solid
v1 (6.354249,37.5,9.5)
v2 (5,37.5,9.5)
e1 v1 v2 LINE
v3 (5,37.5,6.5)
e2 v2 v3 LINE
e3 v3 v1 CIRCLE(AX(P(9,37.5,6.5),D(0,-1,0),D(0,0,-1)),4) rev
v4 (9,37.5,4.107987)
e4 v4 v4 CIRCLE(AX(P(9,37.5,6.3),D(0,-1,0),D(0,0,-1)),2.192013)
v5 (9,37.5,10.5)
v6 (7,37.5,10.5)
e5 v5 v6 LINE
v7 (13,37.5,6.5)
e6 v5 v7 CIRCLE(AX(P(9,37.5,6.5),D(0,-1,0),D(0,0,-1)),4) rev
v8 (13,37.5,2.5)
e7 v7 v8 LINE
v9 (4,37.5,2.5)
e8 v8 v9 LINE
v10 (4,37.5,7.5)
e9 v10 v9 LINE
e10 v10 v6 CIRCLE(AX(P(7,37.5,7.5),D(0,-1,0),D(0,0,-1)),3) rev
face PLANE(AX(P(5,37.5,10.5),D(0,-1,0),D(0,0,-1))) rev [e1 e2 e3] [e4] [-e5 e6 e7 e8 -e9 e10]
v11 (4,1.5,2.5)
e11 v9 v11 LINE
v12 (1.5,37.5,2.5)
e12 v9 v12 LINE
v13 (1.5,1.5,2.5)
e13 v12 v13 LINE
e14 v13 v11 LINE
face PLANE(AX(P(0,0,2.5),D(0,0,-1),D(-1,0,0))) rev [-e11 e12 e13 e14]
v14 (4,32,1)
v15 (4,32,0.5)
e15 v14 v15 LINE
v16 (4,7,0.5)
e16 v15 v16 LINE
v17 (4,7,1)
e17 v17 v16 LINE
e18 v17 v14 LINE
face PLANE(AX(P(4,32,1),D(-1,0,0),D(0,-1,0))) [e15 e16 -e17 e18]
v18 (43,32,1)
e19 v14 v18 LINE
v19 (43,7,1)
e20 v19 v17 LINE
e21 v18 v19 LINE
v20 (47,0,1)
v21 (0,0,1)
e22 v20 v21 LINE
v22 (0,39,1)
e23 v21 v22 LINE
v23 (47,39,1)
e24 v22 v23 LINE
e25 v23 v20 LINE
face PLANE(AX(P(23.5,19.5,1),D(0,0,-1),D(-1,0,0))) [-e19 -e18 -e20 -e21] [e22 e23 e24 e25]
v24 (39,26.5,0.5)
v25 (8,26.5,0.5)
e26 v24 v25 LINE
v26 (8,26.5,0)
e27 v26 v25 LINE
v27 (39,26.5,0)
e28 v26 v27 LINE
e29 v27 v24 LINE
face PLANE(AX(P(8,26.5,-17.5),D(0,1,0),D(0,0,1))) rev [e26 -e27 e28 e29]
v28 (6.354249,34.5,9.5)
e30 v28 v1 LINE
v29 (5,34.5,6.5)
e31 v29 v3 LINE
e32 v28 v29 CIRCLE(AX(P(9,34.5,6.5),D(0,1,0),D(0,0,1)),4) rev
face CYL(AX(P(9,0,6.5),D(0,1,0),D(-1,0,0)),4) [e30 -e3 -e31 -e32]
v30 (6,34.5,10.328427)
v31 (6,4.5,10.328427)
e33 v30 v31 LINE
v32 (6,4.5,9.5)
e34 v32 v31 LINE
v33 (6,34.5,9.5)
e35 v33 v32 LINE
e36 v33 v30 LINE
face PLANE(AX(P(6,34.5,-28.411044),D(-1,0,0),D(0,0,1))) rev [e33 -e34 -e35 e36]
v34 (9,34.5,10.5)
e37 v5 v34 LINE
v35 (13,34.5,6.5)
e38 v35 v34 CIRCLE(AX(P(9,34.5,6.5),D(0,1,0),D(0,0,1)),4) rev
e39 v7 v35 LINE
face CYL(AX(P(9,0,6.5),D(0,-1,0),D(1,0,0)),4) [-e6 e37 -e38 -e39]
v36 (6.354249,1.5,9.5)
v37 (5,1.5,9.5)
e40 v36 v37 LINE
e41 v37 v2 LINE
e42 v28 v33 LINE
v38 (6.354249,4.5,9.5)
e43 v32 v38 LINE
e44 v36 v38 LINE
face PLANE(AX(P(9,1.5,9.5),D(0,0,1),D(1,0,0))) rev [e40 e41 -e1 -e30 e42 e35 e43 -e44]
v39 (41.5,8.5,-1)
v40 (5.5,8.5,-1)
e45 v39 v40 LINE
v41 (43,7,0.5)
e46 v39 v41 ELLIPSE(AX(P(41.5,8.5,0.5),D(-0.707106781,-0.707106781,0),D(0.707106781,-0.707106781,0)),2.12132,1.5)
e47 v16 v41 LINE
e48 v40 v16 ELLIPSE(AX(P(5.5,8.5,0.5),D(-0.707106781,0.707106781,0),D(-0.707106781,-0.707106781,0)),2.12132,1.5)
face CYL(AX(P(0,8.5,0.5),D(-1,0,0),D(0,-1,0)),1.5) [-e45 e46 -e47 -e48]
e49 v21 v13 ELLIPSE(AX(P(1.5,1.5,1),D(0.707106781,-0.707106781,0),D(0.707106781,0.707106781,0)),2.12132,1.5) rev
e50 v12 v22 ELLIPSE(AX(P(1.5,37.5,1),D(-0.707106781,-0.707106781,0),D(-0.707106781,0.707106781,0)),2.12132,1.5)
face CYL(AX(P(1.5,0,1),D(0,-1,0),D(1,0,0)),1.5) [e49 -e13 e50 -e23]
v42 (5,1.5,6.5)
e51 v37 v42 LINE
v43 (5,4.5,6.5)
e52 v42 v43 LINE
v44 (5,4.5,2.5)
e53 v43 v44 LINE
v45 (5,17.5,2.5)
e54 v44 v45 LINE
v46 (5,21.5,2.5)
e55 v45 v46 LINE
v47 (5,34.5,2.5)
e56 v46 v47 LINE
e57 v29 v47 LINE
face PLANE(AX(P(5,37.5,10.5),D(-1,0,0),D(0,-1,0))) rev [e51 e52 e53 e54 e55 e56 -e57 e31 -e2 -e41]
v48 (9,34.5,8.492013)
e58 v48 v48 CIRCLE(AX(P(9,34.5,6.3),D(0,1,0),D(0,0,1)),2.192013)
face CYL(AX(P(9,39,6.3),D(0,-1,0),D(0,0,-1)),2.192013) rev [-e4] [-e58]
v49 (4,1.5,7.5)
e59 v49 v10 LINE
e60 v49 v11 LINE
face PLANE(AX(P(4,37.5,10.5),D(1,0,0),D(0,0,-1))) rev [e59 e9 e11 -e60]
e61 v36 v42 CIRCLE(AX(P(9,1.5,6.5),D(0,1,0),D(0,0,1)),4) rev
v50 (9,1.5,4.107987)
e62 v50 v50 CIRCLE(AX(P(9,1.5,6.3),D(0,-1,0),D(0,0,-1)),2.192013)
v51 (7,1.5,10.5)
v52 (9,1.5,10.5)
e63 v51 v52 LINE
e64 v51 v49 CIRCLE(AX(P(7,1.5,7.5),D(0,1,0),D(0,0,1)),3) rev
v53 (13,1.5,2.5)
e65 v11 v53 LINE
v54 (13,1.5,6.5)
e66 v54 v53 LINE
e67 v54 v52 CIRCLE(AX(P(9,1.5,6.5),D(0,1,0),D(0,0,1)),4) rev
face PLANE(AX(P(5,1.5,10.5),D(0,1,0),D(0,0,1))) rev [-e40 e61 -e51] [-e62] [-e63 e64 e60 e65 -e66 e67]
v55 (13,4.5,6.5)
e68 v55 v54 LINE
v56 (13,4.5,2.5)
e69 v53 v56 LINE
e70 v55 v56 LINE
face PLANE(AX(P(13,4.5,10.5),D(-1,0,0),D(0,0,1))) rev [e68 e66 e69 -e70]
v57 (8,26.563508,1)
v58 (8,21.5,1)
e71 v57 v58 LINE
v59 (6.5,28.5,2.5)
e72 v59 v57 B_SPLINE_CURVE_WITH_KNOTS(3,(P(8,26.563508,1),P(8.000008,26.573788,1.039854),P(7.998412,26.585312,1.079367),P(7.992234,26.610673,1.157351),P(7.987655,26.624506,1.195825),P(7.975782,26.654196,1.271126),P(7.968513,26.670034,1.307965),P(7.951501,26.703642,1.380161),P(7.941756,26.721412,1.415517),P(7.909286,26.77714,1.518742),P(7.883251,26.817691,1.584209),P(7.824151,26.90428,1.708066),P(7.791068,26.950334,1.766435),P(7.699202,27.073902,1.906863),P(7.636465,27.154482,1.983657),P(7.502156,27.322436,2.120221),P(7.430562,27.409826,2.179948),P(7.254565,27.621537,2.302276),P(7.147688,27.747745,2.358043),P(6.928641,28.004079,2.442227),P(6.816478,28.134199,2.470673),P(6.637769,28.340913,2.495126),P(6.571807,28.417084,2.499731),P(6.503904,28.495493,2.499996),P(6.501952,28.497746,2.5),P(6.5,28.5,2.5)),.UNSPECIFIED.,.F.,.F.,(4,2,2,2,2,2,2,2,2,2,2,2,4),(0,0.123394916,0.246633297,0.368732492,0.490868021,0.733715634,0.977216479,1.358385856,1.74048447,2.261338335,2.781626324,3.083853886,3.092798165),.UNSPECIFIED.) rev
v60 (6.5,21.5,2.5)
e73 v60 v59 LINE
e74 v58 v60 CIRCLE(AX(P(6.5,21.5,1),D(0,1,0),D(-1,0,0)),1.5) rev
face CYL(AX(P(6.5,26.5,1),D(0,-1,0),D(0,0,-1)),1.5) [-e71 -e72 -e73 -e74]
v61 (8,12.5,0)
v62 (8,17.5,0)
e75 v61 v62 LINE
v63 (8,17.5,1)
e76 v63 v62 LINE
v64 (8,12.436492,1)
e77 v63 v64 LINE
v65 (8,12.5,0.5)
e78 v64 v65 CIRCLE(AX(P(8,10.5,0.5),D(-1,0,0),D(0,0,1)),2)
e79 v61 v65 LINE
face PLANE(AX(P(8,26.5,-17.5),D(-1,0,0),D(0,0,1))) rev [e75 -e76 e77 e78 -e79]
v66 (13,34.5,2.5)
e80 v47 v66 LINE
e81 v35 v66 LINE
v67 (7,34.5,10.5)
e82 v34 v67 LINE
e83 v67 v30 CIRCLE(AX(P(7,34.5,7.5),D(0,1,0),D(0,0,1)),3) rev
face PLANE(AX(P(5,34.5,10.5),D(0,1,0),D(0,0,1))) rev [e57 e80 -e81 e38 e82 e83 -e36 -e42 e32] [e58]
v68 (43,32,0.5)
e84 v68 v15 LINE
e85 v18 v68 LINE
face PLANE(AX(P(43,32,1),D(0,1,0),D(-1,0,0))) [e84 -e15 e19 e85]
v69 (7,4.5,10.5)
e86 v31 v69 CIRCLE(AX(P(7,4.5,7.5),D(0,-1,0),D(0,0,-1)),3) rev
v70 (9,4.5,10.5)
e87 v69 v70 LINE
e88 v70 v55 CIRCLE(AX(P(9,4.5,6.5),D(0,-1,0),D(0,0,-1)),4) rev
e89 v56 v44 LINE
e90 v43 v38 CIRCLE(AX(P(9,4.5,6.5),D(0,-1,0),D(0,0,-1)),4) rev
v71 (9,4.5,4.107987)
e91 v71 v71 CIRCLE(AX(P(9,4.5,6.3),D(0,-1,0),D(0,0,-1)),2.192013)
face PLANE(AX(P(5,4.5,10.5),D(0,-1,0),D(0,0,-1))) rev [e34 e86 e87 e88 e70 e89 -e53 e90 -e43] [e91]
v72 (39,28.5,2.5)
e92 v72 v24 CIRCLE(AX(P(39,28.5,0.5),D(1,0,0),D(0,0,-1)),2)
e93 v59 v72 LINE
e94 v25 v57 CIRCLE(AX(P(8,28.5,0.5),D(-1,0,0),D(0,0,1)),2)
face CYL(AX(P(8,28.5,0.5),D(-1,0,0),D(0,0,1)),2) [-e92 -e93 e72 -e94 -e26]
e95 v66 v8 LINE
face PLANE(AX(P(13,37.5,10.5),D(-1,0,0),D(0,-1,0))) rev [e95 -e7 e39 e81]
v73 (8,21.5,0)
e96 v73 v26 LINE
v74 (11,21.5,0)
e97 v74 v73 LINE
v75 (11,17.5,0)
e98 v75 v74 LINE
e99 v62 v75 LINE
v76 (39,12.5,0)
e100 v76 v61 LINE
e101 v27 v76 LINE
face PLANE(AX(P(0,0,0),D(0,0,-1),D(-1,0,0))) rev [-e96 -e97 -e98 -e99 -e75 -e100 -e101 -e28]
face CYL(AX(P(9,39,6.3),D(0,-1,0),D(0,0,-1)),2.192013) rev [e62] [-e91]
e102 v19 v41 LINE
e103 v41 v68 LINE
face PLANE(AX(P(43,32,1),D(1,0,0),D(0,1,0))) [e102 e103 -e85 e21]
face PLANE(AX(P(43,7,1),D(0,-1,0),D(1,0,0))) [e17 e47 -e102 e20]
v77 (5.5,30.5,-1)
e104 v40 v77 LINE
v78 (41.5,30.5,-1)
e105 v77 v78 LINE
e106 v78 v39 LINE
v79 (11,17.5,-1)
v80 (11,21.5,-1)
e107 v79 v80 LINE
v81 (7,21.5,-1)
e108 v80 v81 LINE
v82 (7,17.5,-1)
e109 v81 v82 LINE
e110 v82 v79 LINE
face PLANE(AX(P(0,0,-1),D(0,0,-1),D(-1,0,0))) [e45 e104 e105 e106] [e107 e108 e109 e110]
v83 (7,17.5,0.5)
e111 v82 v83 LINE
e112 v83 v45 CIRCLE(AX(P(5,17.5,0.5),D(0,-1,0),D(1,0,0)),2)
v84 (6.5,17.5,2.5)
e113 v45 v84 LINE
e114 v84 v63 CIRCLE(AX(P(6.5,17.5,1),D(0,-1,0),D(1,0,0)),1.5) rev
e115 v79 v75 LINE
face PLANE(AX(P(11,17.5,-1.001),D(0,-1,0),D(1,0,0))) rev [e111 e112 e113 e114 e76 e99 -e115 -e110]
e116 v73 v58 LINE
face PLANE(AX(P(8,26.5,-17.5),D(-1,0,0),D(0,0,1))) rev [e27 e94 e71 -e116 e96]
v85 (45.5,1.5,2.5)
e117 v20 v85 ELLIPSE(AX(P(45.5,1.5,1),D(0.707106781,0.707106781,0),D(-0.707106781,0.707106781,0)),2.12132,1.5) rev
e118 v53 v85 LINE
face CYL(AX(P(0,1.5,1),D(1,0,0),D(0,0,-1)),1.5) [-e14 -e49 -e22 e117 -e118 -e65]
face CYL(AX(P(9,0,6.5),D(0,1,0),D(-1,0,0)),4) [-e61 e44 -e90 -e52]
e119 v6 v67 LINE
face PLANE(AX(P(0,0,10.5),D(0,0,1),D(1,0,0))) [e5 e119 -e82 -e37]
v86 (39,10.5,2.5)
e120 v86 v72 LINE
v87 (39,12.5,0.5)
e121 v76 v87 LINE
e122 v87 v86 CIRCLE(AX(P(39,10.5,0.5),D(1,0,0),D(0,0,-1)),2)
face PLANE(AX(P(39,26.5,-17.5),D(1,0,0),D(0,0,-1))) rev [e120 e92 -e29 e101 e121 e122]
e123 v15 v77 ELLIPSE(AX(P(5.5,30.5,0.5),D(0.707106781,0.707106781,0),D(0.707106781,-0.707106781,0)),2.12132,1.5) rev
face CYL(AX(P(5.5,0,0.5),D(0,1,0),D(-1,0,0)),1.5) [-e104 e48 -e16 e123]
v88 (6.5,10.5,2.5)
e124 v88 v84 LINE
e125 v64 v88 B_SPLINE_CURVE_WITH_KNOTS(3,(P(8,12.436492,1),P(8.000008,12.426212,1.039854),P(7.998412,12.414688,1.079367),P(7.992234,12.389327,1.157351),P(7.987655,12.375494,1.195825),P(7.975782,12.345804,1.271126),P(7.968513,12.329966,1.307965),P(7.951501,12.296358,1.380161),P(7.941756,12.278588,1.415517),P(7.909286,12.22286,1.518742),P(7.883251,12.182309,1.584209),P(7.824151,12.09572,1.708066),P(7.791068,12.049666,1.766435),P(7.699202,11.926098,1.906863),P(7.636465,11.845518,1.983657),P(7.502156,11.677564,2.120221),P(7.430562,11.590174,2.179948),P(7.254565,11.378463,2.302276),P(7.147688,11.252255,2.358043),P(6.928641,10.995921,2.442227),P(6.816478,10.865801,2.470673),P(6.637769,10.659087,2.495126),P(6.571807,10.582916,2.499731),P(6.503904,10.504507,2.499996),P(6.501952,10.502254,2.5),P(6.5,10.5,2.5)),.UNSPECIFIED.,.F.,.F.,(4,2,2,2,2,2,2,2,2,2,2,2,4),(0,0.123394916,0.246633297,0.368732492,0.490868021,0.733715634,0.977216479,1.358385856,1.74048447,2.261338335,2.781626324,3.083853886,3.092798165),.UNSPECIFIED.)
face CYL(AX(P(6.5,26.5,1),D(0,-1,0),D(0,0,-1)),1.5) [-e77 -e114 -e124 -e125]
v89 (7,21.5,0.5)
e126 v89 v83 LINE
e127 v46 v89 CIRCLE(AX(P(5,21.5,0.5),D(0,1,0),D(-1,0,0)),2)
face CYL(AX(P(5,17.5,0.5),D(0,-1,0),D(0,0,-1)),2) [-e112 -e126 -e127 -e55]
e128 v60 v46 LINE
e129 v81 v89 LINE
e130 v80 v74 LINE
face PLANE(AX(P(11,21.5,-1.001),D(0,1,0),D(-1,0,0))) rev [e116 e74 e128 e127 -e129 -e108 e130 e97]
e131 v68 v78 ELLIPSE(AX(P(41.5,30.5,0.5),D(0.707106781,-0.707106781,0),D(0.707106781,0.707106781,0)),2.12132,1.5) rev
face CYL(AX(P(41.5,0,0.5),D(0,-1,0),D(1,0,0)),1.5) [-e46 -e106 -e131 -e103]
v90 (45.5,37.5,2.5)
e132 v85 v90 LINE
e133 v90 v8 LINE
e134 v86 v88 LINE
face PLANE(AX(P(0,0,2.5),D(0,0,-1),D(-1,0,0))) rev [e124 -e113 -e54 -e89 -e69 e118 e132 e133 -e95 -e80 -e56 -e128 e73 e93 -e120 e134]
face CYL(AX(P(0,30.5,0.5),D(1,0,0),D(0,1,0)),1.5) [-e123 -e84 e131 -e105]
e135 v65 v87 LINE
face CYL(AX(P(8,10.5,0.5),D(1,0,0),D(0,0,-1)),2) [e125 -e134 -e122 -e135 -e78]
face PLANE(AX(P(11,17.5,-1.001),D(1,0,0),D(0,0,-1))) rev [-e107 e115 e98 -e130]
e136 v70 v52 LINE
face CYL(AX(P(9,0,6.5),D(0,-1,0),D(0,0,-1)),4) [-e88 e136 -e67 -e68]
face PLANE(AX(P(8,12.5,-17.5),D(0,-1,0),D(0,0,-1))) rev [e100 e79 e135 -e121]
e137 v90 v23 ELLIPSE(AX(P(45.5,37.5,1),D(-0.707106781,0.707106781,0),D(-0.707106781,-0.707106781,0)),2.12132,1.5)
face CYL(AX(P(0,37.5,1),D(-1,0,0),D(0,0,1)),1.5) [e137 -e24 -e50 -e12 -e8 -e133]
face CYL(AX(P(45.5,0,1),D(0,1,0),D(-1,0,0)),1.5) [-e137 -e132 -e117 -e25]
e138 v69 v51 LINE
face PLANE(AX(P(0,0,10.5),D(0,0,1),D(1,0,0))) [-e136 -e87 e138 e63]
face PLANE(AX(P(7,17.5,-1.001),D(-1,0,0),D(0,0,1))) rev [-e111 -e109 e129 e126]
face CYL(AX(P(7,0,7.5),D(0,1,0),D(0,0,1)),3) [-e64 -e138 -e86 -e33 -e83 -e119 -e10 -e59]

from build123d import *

# Parameters (mm, degrees)
ESQUISSE1_W             = 47
ESQUISSE1_H             = 39
BOSS_EXTRU_1_DEPTH      = 2.5
ESQUISSE2_W             = 8
ESQUISSE2_H             = 3
BOSS_EXTRU_2_DEPTH      = 8
ESQUISSE3_R             = 2.192012696
ENL_V_MAT_EXTRU_1_DEPTH = 62.036874101
CONG_1_R                = 4
ESQUISSE4_W             = 31
ESQUISSE4_H             = 14
ENL_V_MAT_EXTRU_2_DEPTH = 20
CONG_2_R                = 2
ESQUISSE8_W             = 1
ESQUISSE8_H             = 36
BOSS_EXTRU_5_DEPTH      = 8
ESQUISSE9_W             = 1
ESQUISSE9_H             = 36
BOSS_EXTRU_6_DEPTH      = 4
ESQUISSE10_W            = 7.449336574
ESQUISSE10_H            = 30
ENL_V_MAT_EXTRU_4_DEPTH = 8
CONG_4_R                = 3
ESQUISSE11_OUTSIDE_W    = 61.394
ESQUISSE11_OUTSIDE_H    = 53.394
ESQUISSE11_OUTSIDE_W_2  = 39
ESQUISSE11_OUTSIDE_H_2  = 25
ENL_V_MAT_EXTRU_5_DEPTH = 1
ESQUISSE12_W            = 39
ESQUISSE12_H            = 25
BOSS_EXTRU_7_DEPTH      = 1
ENL_V_MAT_EXTRU_6_REACH = 63.595
ESQUISSE13_W            = 4
ESQUISSE13_H            = 4
CONG_6_R                = 2
CONG_7_R                = 1.5
CONG_8_R                = 1.5


# Some blends are built 0.0001 mm under size
with BuildPart() as part:
    # Esquisse1 → Boss.-Extru.1 (new body)
    with BuildSketch(Plane.XY):
        with Locations((23.5, 19.5)):
            Rectangle(ESQUISSE1_W, ESQUISSE1_H)
    extrude(amount=BOSS_EXTRU_1_DEPTH)

    # Esquisse2 → Boss.-Extru.2 (add)
    with BuildSketch(Plane.XY.offset(2.5)):
        with Locations((9, 36)):
            Rectangle(ESQUISSE2_W, ESQUISSE2_H)
        with Locations((9, 3)):
            Rectangle(ESQUISSE2_W, ESQUISSE2_H)
    extrude(amount=BOSS_EXTRU_2_DEPTH)

    # Esquisse3 → Enlèv. mat.-Extru.1 (cut, through all)
    with BuildSketch(Plane.XZ.offset(-1.5)):
        with Locations(Location((9, 6.3, 0), (0, 0, 270))):
            Circle(ESQUISSE3_R)
    extrude(amount=-ENL_V_MAT_EXTRU_1_DEPTH, mode=Mode.SUBTRACT)

    # Congé1
    cong_1_edges = [part.edges().sort_by_distance(p)[0] for p in [
        (13, 3, 10.5),
        (5, 3, 10.5),
        (13, 36, 10.5),
        (5, 36, 10.5),
    ]]
    fillet(cong_1_edges, radius=CONG_1_R - 0.0001)  # a hair under: the kernel refuses the full size

    # Esquisse4 → Enlèv. mat.-Extru.2 (cut)
    with BuildSketch(Plane.XY.offset(2.5)):
        with Locations((23.5, 19.5)):
            Rectangle(ESQUISSE4_W, ESQUISSE4_H)
    extrude(amount=-ENL_V_MAT_EXTRU_2_DEPTH, mode=Mode.SUBTRACT)

    # Congé2
    cong_2_edges = [part.edges().sort_by_distance(p)[0] for p in [
        (23.5, 12.5, 2.5),
        (23.5, 26.5, 2.5),
    ]]
    fillet(cong_2_edges, radius=CONG_2_R)

    # Esquisse8 → Boss.-Extru.5 (add)
    with BuildSketch(Plane.XY.offset(2.5)):
        with Locations((4.5, 19.5)):
            Rectangle(ESQUISSE8_W, ESQUISSE8_H)
    extrude(amount=BOSS_EXTRU_5_DEPTH)

    # Esquisse9 → Boss.-Extru.6 (add)
    with BuildSketch(Plane(origin=(5, 0, 0), x_dir=(0, 0, -1), z_dir=(1, 0, 0))):
        with Locations((-10, 19.5)):
            Rectangle(ESQUISSE9_W, ESQUISSE9_H)
    extrude(amount=BOSS_EXTRU_6_DEPTH)

    # Esquisse10 → Enlèv. mat.-Extru.4 (cut)
    with BuildSketch(Plane.XY.offset(10.5)):
        with Locations((9.724668287, 19.5)):
            Rectangle(ESQUISSE10_W, ESQUISSE10_H)
    extrude(amount=-ENL_V_MAT_EXTRU_4_DEPTH, mode=Mode.SUBTRACT)

    # Congé4
    # the kernel refuses this fillet: 3 mm, written as the material it takes off along each edge
    with BuildSketch(Plane(origin=(4, -6, 10.5), x_dir=(1, 0, 0), z_dir=(0, 1, 0))) as cong_4_piece_1:
        with BuildLine():
            CenterArc((CONG_4_R, CONG_4_R), CONG_4_R, 180, 90)
            Line((0, CONG_4_R), (0, 0))
            Line((0, 0), (CONG_4_R, 0))
        make_face()
    extrude(amount=51, mode=Mode.SUBTRACT)

    # Esquisse11 outside → Enlèv. mat.-Extru.5 (cut)
    with BuildSketch(Plane(origin=(0, 0, 0), x_dir=(-1, 0, 0), z_dir=(0, 0, -1))):
        with Locations((-23.5, 19.5)):
            Rectangle(ESQUISSE11_OUTSIDE_W, ESQUISSE11_OUTSIDE_H)
        with Locations((-23.5, 19.5)):
            Rectangle(ESQUISSE11_OUTSIDE_W_2, ESQUISSE11_OUTSIDE_H_2, mode=Mode.SUBTRACT)
    extrude(amount=-ENL_V_MAT_EXTRU_5_DEPTH, mode=Mode.SUBTRACT)

    # Esquisse12 → Boss.-Extru.7 (add)
    with BuildSketch(Plane(origin=(0, 0, 0), x_dir=(-1, 0, 0), z_dir=(0, 0, -1))):
        with Locations((-23.5, 19.5)):
            Rectangle(ESQUISSE12_W, ESQUISSE12_H)
    extrude(amount=BOSS_EXTRU_7_DEPTH)

    # Esquisse13 → Enlèv. mat.-Extru.6 (cut, up to next)
    with BuildSketch(Plane.XY.offset(2.5), mode=Mode.PRIVATE) as enl_v_mat_extru_6_sk1:
        with Locations((9, 19.5)):
            Rectangle(ESQUISSE13_W, ESQUISSE13_H)
    enl_v_mat_extru_6_tool1 = extrude(enl_v_mat_extru_6_sk1.sketch, amount=-ENL_V_MAT_EXTRU_6_REACH, mode=Mode.PRIVATE) & part.part
    add(enl_v_mat_extru_6_tool1.solids().sort_by_distance((9, 19.5, 2.5))[0], mode=Mode.SUBTRACT)

    # Congé6
    cong_6_edges = [part.edges().sort_by_distance(p)[0] for p in [
        (7, 19.5, 2.5),
    ]]
    fillet(cong_6_edges, radius=CONG_6_R - 0.0001)  # a hair under: the kernel refuses the full size

    # Congé7
    cong_7_edges = [part.edges().sort_by_distance(p)[0] for p in [
        (8, 25, 2.5),
        (8, 14, 2.5),
        (0, 19.5, 2.5),
        (23.5, 0, 2.5),
        (47, 19.5, 2.5),
        (23.5, 39, 2.5),
    ]]
    fillet(cong_7_edges, radius=CONG_7_R - 0.0001)  # a hair under: the kernel refuses the full size

    # Congé8
    cong_8_edges = [part.edges().sort_by_distance(p)[0] for p in [
        (43, 19.5, -1),
        (23.5, 7, -1),
        (4, 19.5, -1),
        (23.5, 32, -1),
    ]]
    fillet(cong_8_edges, radius=CONG_8_R)


solid = part.part
